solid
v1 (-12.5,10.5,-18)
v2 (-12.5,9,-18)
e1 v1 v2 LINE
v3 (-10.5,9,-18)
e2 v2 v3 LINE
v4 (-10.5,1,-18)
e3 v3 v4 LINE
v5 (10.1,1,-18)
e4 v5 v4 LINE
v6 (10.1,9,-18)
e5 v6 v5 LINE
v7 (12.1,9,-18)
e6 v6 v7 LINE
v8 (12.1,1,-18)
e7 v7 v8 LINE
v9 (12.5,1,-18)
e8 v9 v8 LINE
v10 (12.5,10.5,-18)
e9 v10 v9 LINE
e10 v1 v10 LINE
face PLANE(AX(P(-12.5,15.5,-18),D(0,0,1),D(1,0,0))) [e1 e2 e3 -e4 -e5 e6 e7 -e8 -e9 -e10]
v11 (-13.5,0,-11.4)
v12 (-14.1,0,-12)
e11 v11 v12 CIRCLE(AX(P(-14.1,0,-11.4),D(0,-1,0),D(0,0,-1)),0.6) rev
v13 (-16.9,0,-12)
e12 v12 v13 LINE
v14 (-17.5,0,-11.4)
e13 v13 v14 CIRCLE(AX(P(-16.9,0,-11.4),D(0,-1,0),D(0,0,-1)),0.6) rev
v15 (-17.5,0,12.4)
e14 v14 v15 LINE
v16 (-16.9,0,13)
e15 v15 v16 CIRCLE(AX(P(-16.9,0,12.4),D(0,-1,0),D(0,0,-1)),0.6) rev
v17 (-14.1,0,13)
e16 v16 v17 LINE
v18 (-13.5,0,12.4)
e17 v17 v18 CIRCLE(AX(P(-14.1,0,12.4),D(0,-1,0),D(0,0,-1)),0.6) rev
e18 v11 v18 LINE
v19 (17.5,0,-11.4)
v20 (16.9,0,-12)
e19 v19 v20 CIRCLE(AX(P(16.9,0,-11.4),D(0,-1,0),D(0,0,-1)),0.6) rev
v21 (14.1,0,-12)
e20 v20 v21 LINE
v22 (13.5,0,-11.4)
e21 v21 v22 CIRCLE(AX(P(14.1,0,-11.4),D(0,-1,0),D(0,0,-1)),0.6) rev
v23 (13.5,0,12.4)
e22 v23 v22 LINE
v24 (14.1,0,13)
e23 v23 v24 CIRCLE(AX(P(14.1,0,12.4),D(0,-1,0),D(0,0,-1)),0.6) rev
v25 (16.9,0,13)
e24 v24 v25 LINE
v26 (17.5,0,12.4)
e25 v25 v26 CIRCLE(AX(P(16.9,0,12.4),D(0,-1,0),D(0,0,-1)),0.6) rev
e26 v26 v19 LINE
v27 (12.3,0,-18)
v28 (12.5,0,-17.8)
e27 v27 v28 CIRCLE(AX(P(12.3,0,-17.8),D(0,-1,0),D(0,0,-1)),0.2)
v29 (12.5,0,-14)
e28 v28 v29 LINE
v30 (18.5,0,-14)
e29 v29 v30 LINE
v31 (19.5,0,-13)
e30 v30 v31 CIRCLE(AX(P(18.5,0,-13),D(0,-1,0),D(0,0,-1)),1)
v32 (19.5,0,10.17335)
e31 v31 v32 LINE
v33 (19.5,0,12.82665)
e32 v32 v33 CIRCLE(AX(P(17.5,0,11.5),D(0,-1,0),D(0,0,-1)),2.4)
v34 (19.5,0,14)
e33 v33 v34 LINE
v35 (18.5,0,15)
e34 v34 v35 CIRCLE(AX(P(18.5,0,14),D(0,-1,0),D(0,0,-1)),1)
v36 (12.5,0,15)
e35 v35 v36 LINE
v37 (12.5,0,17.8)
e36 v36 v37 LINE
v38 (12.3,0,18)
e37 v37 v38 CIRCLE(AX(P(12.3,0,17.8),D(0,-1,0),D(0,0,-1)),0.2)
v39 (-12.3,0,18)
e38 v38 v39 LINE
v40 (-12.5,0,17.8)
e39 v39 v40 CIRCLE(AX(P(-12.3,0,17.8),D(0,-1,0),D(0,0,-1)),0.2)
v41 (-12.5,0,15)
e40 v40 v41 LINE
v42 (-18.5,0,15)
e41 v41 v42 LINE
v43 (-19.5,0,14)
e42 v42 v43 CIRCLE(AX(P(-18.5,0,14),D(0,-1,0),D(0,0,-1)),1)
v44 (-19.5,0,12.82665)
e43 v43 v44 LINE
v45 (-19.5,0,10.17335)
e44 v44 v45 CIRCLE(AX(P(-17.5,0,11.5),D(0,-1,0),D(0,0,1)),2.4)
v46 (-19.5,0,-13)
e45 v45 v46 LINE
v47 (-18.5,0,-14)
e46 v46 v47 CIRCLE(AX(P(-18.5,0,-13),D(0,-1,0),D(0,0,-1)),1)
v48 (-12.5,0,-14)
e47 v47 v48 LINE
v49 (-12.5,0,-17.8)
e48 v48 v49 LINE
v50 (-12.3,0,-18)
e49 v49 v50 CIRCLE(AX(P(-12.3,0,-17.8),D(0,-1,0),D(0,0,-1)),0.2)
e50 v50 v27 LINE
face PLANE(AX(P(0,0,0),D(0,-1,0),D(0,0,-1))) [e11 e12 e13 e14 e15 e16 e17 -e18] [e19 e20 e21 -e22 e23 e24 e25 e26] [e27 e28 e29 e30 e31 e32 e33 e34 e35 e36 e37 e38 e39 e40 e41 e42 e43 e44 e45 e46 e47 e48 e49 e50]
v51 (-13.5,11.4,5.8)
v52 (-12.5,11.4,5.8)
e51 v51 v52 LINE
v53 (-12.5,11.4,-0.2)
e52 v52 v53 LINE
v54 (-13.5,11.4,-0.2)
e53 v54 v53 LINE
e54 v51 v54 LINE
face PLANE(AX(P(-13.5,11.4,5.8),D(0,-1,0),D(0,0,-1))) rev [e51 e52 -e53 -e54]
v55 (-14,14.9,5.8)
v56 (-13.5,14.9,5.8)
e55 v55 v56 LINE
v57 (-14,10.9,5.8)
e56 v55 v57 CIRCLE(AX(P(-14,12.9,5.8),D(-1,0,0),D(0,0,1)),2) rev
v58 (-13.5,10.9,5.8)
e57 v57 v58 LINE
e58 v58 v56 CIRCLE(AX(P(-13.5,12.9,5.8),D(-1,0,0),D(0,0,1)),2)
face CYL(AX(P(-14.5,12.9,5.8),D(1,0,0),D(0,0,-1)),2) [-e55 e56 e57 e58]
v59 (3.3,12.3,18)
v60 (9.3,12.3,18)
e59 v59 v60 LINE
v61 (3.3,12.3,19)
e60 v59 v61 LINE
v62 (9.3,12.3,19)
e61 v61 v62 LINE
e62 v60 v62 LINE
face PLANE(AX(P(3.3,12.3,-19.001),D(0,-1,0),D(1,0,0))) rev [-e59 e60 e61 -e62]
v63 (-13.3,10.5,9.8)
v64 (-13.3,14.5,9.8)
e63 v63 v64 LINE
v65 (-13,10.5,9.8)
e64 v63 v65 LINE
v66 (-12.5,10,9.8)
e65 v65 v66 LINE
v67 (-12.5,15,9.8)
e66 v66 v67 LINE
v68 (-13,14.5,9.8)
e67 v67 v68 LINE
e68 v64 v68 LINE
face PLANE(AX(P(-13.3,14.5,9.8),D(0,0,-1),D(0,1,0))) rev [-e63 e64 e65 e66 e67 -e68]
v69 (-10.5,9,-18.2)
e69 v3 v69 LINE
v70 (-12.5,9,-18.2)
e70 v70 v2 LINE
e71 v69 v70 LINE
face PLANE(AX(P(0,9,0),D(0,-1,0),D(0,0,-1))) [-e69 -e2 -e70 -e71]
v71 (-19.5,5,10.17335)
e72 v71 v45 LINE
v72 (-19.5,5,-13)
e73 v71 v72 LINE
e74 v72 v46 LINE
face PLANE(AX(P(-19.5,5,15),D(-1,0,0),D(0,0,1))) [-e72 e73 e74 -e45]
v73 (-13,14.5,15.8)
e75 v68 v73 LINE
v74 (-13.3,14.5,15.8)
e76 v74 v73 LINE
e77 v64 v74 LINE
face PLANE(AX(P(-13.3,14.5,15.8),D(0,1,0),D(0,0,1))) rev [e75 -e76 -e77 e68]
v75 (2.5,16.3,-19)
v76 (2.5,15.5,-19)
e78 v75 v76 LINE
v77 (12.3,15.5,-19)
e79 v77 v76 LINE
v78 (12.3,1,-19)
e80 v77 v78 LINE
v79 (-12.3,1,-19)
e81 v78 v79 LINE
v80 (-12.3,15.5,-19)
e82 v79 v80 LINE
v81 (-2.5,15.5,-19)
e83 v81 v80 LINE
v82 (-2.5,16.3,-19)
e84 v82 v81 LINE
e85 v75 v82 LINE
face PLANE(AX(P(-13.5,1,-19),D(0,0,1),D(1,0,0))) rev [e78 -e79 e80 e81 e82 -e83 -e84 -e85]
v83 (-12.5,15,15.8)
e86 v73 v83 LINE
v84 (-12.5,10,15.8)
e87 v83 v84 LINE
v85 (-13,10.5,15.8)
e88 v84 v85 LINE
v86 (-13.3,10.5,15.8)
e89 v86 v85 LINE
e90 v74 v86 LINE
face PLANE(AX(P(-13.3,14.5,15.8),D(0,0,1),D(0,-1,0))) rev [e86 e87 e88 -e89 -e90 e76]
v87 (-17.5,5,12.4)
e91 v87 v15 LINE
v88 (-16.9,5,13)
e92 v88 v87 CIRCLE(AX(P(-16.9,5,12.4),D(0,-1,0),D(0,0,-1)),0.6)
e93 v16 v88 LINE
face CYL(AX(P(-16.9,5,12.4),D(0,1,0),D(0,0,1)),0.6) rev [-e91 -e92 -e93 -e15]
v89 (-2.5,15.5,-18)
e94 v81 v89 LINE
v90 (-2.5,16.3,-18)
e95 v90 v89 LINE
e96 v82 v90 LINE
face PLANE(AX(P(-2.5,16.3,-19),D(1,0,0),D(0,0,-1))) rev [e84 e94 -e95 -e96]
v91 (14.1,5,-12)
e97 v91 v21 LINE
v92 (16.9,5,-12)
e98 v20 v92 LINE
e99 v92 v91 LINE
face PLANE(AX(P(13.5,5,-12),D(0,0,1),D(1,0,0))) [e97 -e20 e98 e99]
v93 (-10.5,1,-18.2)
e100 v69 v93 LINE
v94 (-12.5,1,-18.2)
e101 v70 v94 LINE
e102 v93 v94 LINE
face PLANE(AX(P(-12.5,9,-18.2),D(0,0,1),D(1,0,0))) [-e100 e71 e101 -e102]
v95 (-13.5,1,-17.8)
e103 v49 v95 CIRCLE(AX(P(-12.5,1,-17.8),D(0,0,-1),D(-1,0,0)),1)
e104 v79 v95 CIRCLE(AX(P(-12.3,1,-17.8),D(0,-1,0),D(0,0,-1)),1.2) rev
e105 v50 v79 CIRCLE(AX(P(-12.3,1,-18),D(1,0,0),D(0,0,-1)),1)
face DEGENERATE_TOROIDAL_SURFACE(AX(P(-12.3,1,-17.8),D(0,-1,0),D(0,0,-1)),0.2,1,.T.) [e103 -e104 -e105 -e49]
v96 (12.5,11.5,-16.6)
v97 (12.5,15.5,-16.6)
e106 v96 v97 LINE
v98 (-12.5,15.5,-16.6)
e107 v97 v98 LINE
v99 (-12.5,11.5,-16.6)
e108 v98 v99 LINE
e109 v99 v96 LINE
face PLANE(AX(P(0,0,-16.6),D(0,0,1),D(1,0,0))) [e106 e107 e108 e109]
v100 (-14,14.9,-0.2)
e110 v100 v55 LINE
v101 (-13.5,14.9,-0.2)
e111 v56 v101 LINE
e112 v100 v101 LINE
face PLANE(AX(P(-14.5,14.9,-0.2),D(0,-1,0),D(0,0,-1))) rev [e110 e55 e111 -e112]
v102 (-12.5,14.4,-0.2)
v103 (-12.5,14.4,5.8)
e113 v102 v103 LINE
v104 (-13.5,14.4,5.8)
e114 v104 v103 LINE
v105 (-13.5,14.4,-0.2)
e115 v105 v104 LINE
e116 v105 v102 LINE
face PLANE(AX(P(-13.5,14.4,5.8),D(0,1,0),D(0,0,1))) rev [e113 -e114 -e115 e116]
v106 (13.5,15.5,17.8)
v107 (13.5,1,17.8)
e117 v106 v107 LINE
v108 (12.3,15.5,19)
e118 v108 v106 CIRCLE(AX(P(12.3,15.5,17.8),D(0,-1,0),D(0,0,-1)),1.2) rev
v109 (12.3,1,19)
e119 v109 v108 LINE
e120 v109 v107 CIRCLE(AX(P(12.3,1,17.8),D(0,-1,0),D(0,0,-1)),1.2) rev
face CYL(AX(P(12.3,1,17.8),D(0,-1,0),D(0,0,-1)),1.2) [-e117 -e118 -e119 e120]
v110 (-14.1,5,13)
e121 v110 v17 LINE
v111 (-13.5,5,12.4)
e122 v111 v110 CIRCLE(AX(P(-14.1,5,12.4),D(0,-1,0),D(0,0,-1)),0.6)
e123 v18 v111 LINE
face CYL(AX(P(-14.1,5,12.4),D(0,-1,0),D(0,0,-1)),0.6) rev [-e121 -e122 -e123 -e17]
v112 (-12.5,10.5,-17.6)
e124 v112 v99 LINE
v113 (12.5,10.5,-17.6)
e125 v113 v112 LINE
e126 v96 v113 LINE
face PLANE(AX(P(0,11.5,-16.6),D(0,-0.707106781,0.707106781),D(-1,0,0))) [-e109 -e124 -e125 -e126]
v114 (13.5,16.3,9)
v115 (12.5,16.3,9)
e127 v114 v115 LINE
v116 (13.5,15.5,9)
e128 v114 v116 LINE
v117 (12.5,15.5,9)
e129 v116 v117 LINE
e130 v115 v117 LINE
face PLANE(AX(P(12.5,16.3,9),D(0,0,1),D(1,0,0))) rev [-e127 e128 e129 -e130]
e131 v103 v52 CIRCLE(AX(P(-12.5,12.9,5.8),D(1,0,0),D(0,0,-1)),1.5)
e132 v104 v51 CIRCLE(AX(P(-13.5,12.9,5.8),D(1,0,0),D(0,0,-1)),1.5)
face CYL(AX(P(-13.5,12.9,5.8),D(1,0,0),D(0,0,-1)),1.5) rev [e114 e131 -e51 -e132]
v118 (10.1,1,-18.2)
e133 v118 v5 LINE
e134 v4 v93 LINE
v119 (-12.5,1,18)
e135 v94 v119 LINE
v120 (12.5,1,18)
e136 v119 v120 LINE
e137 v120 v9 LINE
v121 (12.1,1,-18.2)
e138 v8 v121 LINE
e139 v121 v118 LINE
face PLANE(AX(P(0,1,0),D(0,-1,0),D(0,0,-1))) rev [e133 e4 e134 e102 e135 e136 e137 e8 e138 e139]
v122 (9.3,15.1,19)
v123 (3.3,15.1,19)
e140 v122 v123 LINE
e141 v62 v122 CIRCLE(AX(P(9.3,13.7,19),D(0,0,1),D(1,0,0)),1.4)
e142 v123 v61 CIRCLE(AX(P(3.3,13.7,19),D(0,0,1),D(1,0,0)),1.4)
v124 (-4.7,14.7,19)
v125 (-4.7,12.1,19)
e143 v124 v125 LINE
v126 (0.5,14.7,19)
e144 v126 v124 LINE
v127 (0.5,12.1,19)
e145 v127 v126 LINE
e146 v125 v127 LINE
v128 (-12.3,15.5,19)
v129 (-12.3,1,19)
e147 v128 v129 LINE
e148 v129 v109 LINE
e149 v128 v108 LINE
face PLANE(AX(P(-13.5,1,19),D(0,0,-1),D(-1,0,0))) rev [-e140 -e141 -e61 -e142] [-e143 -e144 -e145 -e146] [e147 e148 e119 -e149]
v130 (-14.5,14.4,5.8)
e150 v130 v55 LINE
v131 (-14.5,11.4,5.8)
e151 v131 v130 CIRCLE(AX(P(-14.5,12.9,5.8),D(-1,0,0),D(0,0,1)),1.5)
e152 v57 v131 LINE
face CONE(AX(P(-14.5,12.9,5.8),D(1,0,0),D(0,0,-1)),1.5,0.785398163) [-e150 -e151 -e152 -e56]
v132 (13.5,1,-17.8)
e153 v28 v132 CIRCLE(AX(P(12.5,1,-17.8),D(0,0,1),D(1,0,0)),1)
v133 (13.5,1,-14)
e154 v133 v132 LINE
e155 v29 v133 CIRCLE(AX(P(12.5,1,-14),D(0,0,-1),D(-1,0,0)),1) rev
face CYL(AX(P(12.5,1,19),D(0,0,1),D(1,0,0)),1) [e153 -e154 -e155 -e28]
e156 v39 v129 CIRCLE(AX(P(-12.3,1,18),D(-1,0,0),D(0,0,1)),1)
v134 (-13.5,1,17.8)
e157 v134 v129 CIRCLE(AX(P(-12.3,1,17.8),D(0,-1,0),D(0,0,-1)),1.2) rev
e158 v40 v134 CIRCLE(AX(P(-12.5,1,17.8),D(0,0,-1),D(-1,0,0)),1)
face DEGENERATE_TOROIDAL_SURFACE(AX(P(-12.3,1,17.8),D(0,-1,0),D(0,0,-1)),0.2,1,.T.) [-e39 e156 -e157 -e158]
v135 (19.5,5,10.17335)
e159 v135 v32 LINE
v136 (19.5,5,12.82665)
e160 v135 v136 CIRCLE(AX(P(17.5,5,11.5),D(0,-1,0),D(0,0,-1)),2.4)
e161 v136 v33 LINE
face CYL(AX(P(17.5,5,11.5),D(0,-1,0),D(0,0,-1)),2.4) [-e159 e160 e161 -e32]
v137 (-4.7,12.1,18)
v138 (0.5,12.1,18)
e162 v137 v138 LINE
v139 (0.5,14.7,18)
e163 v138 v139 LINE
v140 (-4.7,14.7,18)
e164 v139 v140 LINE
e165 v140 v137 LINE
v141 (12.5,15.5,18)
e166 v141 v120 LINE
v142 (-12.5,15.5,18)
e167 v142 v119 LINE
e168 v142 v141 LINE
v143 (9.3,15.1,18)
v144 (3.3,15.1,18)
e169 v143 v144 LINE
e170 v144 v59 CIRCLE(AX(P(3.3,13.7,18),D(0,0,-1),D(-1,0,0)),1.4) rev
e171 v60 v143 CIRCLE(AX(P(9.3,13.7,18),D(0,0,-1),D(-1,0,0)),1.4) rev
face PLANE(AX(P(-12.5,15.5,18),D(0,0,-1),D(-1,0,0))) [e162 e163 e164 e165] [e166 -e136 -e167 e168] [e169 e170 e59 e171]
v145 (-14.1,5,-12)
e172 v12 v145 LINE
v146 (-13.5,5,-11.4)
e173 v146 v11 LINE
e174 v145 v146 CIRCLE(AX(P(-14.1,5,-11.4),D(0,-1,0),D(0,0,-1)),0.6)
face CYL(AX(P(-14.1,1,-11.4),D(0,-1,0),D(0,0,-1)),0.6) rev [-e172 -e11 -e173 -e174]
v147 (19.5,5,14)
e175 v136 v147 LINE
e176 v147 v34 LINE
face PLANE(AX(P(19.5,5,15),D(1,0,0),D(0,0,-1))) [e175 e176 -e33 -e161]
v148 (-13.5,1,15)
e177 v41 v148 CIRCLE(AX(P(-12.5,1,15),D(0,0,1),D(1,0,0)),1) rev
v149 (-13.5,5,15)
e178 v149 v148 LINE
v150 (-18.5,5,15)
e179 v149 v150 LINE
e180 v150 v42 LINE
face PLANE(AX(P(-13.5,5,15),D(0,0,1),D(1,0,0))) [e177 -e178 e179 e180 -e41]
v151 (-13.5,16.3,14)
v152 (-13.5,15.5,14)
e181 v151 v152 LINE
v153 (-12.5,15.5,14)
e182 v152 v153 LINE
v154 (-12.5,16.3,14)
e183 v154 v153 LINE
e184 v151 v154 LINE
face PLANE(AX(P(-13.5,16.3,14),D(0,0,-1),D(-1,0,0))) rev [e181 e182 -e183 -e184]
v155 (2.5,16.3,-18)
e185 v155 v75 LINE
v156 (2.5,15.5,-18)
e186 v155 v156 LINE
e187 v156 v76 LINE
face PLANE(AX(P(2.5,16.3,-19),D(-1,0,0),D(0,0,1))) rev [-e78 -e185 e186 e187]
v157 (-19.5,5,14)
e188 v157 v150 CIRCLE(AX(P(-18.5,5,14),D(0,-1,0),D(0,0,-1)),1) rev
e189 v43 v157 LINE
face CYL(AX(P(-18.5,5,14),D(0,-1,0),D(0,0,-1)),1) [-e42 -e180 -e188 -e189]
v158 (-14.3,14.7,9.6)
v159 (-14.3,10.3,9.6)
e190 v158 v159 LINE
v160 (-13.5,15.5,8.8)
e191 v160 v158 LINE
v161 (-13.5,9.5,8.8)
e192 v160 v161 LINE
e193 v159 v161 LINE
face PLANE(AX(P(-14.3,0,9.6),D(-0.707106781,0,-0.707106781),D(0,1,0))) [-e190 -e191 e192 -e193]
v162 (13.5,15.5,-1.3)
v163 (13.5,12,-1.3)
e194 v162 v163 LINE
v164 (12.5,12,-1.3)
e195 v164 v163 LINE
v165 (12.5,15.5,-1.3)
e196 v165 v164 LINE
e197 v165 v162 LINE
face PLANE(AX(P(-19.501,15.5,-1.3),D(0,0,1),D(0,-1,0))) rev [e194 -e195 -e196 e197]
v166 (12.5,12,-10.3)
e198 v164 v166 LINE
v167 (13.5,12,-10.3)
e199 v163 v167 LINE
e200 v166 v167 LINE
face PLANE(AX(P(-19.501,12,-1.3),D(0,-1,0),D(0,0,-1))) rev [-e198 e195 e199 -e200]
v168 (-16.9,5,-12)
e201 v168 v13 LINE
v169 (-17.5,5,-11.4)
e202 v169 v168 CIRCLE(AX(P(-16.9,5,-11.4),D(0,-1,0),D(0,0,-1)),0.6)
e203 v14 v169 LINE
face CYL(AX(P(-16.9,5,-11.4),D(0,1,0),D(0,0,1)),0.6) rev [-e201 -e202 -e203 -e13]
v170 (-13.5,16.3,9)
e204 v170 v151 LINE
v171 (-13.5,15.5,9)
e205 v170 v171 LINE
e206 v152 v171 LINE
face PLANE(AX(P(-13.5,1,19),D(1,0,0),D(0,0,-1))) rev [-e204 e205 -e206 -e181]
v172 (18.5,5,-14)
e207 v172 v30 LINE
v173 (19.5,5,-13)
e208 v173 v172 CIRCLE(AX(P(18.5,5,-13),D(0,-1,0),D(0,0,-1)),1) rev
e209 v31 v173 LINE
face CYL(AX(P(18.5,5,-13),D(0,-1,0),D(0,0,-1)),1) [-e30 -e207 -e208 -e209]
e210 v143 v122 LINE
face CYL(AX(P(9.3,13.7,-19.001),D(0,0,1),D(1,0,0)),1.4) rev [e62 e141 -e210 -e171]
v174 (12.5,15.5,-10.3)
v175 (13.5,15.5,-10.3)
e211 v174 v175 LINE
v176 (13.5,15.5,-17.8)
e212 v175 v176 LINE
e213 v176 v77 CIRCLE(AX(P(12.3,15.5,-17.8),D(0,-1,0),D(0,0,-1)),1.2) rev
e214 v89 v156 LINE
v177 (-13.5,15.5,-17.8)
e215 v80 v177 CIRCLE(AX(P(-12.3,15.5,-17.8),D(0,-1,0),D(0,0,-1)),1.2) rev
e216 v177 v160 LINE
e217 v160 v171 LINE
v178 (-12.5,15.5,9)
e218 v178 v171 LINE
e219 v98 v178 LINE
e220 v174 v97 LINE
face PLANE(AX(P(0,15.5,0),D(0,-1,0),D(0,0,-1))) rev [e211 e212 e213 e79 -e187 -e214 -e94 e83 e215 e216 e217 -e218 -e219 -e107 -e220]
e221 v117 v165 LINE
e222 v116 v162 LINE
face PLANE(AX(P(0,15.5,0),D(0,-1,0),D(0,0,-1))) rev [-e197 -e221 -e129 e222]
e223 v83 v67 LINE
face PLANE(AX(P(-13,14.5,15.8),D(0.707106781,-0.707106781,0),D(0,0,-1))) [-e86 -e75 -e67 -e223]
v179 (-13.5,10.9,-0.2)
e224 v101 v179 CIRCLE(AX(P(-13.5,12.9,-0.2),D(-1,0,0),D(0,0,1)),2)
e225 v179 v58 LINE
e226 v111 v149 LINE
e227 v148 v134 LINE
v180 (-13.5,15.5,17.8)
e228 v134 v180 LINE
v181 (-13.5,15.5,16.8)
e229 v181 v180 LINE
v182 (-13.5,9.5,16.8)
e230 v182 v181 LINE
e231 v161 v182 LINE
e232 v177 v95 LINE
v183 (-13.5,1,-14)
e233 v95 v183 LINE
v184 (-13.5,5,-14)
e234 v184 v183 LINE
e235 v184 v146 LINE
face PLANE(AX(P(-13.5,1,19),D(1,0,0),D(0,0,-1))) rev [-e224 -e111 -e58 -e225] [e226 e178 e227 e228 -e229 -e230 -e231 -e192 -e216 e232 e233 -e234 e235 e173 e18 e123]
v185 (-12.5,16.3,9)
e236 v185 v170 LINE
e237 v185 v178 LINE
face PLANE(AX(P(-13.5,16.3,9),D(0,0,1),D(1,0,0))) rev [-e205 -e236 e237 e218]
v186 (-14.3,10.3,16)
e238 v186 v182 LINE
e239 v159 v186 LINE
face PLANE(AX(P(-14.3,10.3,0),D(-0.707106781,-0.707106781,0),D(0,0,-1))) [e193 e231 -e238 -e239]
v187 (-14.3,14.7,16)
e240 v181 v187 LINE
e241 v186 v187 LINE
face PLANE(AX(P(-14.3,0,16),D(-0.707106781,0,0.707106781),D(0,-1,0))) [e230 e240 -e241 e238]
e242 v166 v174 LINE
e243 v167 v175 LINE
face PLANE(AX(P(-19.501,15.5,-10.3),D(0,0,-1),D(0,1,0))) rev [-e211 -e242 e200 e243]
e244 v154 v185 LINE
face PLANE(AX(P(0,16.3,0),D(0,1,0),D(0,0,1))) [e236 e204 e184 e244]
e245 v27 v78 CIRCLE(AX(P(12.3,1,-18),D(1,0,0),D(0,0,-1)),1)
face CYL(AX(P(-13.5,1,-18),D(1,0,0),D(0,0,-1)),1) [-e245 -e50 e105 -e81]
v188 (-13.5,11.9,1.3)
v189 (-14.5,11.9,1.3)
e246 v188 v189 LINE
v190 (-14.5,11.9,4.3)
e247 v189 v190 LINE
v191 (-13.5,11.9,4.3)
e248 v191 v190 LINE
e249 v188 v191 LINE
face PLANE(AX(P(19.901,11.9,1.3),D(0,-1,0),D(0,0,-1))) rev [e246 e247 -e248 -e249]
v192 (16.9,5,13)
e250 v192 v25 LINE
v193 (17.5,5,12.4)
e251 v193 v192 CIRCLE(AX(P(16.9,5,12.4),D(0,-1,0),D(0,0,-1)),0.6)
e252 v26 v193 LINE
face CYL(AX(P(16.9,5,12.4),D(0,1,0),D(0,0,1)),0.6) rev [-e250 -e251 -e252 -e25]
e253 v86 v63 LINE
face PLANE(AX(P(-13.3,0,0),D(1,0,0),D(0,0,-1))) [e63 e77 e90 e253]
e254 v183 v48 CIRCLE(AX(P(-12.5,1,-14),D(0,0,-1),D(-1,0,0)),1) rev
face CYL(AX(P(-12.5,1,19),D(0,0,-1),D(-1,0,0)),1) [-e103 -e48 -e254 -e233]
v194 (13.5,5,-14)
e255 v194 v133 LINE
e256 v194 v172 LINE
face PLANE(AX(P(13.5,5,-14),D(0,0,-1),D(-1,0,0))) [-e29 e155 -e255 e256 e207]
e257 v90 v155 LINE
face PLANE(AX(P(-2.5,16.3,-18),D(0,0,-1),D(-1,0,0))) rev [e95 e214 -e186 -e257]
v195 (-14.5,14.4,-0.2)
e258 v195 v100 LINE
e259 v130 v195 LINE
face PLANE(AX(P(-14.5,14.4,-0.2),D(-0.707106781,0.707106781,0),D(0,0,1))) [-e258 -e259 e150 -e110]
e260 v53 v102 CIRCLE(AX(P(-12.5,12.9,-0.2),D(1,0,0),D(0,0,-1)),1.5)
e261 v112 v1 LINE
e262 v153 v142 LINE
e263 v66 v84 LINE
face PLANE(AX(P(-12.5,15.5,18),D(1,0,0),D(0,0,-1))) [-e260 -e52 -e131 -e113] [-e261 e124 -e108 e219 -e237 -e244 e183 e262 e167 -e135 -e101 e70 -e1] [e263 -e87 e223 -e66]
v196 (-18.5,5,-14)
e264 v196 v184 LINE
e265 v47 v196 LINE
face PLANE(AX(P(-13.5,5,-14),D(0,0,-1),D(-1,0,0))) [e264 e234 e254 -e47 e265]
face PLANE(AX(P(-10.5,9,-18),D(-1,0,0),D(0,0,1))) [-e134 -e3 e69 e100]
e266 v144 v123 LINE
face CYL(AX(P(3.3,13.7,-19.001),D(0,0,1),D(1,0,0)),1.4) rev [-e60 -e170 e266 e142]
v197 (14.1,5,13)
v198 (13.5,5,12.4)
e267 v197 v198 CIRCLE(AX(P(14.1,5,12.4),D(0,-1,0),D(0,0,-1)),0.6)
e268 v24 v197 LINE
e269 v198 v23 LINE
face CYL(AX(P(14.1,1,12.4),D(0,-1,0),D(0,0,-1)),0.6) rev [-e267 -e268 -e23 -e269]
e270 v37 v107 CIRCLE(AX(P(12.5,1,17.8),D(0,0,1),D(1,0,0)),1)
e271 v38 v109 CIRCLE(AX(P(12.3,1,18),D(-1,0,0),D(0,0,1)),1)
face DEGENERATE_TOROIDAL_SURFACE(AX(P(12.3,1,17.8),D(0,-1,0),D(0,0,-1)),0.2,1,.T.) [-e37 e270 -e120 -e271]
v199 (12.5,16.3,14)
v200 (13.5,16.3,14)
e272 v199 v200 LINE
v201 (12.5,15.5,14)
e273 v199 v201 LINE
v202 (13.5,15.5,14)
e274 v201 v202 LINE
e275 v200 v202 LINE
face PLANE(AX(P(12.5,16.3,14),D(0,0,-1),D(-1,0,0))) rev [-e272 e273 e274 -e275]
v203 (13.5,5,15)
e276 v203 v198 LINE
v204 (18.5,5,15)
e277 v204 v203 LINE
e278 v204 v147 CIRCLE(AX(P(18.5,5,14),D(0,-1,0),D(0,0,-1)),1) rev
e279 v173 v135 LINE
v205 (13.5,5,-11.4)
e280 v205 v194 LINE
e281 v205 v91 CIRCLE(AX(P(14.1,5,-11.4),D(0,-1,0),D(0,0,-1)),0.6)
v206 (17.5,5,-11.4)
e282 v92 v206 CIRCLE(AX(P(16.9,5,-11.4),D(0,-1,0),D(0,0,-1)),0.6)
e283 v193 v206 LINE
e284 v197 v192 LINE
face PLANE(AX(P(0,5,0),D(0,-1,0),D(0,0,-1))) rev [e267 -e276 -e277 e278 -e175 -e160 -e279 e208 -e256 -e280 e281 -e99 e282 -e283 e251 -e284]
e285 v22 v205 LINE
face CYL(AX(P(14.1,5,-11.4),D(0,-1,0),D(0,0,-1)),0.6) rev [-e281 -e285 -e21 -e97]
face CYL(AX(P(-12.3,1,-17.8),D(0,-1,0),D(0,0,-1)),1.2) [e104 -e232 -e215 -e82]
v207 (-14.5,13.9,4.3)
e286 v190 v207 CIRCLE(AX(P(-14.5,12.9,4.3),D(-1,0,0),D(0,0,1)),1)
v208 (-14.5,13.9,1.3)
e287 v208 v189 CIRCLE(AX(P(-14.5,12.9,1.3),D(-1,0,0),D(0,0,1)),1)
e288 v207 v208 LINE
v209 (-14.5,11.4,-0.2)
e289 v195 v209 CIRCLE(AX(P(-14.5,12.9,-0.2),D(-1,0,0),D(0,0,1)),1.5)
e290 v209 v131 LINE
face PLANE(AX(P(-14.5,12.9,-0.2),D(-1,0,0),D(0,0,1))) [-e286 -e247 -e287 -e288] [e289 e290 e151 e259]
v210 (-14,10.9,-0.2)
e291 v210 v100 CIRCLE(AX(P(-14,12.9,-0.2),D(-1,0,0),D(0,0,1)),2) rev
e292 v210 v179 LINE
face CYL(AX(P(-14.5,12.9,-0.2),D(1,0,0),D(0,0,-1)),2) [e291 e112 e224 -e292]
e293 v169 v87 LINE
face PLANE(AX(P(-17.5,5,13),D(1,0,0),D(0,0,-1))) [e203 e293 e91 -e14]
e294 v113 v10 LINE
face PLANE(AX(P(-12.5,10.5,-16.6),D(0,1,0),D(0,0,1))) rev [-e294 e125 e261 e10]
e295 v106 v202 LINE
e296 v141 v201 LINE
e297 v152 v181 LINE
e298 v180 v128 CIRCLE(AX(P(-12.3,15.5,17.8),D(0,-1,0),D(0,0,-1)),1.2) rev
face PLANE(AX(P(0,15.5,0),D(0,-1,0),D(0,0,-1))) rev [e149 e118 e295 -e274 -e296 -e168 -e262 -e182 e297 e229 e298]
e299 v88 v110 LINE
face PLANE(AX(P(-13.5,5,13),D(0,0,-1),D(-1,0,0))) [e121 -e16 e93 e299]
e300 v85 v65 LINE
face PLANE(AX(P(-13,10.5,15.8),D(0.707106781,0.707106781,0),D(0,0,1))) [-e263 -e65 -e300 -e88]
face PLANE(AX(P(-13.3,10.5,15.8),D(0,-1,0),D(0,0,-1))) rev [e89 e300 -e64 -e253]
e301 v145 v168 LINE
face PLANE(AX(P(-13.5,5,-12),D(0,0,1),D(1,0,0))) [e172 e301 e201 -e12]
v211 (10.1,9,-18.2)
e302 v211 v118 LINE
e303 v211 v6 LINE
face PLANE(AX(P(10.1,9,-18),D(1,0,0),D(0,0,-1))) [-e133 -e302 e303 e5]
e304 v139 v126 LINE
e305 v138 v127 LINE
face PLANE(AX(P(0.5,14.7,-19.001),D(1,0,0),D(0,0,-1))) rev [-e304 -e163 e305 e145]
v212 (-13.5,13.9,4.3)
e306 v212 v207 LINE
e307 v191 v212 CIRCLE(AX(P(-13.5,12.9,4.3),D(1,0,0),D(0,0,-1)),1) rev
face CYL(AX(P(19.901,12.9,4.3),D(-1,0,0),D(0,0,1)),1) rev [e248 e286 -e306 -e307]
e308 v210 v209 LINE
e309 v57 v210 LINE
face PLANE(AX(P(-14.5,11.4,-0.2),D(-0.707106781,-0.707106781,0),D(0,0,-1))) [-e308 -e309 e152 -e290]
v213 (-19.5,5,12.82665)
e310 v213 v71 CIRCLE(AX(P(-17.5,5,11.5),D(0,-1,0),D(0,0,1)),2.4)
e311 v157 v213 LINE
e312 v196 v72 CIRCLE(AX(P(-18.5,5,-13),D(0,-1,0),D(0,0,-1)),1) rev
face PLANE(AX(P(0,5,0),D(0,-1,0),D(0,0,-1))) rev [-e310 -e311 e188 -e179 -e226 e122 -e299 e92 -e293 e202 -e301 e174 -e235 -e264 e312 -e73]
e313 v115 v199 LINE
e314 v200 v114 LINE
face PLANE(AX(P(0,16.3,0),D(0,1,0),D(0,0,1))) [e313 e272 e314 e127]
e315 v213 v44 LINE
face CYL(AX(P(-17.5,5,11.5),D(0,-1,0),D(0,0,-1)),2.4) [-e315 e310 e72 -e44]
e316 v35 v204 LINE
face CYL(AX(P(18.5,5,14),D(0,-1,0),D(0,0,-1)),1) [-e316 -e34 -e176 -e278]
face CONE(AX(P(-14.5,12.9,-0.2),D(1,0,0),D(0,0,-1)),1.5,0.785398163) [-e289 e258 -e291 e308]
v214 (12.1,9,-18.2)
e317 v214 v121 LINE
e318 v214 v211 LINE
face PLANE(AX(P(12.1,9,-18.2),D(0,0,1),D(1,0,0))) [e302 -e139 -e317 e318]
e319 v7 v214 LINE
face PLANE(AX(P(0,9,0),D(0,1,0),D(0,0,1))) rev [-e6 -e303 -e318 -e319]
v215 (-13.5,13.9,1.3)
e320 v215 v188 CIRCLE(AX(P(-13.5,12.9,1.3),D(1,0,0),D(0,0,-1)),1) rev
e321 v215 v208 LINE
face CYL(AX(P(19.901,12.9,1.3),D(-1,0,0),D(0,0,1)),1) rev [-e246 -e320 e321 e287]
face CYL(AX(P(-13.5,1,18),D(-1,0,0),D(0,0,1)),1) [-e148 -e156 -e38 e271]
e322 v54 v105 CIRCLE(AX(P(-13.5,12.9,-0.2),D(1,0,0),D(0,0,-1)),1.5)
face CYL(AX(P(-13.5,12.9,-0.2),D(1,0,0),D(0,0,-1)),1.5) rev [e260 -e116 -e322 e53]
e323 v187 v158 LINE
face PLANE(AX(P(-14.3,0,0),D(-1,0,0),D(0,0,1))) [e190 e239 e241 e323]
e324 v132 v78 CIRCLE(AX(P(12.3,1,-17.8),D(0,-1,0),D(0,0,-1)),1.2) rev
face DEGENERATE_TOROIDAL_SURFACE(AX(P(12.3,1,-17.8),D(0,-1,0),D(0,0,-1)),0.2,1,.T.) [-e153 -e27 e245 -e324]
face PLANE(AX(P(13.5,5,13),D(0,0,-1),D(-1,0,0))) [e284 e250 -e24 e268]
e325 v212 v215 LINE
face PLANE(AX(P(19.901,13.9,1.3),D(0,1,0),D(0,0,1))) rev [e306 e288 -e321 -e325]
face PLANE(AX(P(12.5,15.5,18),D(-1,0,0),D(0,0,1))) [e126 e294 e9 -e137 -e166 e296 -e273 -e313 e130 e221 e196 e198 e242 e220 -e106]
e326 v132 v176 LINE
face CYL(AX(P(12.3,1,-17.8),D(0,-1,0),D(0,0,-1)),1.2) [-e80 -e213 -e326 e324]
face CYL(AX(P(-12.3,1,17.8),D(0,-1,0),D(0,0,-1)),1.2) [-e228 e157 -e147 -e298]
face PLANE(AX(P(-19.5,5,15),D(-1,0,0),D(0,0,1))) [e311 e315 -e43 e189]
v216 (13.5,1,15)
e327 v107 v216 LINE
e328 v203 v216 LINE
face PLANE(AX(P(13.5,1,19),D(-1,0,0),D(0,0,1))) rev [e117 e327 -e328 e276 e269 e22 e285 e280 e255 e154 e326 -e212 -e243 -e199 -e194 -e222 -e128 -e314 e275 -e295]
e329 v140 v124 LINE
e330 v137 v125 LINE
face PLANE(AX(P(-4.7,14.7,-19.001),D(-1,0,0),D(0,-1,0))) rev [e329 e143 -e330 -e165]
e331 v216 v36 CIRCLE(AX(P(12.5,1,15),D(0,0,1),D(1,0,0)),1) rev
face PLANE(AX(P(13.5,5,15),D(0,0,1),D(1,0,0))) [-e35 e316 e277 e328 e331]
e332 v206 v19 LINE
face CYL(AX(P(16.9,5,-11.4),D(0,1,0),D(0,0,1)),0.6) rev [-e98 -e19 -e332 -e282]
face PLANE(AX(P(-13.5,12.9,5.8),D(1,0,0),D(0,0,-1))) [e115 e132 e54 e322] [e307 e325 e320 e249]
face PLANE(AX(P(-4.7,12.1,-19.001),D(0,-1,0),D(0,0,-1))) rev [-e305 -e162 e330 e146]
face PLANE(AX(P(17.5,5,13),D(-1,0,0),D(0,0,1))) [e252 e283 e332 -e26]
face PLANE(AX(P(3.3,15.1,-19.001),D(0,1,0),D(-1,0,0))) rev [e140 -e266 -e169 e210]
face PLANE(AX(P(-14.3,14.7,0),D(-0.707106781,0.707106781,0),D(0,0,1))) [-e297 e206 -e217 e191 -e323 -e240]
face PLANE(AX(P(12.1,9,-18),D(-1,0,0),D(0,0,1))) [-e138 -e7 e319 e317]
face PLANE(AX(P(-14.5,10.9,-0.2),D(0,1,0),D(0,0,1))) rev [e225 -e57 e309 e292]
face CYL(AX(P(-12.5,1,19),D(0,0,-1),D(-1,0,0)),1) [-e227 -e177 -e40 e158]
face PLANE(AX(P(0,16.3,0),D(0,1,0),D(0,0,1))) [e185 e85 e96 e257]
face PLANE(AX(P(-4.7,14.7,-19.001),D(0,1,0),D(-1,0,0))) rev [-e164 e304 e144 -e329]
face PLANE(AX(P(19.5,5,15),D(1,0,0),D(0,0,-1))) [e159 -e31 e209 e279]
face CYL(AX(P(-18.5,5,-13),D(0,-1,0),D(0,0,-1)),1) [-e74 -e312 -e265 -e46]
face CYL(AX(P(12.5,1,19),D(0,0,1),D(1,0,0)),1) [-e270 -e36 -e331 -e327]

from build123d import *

# Parameters (mm, degrees)
SKETCH_1_W          = 27
SKETCH_1_H          = 38
EXTRUDE_1_DEPTH     = 1
SKETCH_3_W          = 27
SKETCH_3_H          = 38
SKETCH_3_W_2        = 25
SKETCH_3_H_2        = 36
EXTRUDE_2_DEPTH     = 14.5
FILLET_1_R          = 1.2
EXTRUDE_3_DEPTH     = 5
FILLET_3_R          = 1
FILLET_4_R          = 0.6
FILLET_6_R          = 1
CUT_EXTRUDE_1_REACH = 47.437
CUT_EXTRUDE_2_REACH = 43.113
SKETCH_6_W          = 9
SKETCH_6_H          = 3.5
EXTRUDE_4_DEPTH     = 5
CUT_EXTRUDE_3_REACH = 47.61
SKETCH_8_W          = 5.2
SKETCH_8_H          = 2.6
SKETCH_13_W         = 6
SKETCH_13_H         = 4
CUT_EXTRUDE_6_DEPTH = 0.8
SKETCH_15_W         = 25
SKETCH_15_H         = 5
EXTRUDE_5_DEPTH     = 1.4
CHAMFER_3_SIZE      = 1
SKETCH_16_W         = 2
SKETCH_16_H         = 0.2
CUT_EXTRUDE_7_DEPTH = 8
SKETCH_18_W         = 5
SKETCH_18_H         = 1
SKETCH_18_W_2       = 1
SKETCH_18_H_2       = 5
EXTRUDE_6_DEPTH     = 0.8
EXTRUDE_9_DEPTH     = 1
CUT_EXTRUDE_8_REACH = 44.545
CUT_EXTRUDE_9_DEPTH = 1
CHAMFER_4_SIZE      = 0.5
SKETCH_22_W         = 8
SKETCH_22_H         = 6
EXTRUDE_10_DEPTH    = 0.8
CHAMFER_6_SIZE      = 0.8
CHAMFER_7_SIZE      = 0.5


with BuildPart() as part:
    # 草图1 → 凸台-拉伸1 (new body)
    with BuildSketch(Plane(origin=(0, 0, 0), x_dir=(1, 0, 0), z_dir=(0, 1, 0))):
        Rectangle(SKETCH_1_W, SKETCH_1_H)
    extrude(amount=EXTRUDE_1_DEPTH)

    # 草图3 → 凸台-拉伸2 (add)
    with BuildSketch(Plane(origin=(0, 1, 0), x_dir=(1, 0, 0), z_dir=(0, 1, 0))):
        Rectangle(SKETCH_3_W, SKETCH_3_H)
        Rectangle(SKETCH_3_W_2, SKETCH_3_H_2, mode=Mode.SUBTRACT)
    extrude(amount=EXTRUDE_2_DEPTH)

    # 圆角1
    fillet_1_edges = [part.edges().sort_by_distance(p)[0] for p in [
        (13.5, 7.75, 19),
        (-13.5, 7.75, 19),
        (-13.5, 7.75, -19),
        (13.5, 7.75, -19),
    ]]
    fillet(fillet_1_edges, radius=FILLET_1_R)

    # 草图4 → 凸台-拉伸3 (add)
    with BuildSketch(Plane.XZ):
        Polygon((13.5, 15), (19.5, 15), (19.5, -14), (13.5, -14), (13.5, -12), (17.5, -12), (17.5, 13), (13.5, 13), align=None)
        Polygon((-17.5, 13), (-17.5, -12), (-13.5, -12), (-13.5, -14), (-19.5, -14), (-19.5, 15), (-13.5, 15), (-13.5, 13), align=None)
    extrude(amount=-EXTRUDE_3_DEPTH)

    # 圆角3
    fillet_3_edges = [part.edges().sort_by_distance(p)[0] for p in [
        (19.5, 2.5, 15),
        (19.5, 2.5, -14),
        (-19.5, 2.5, -14),
        (-19.5, 2.5, 15),
    ]]
    fillet(fillet_3_edges, radius=FILLET_3_R)

    # 圆角4
    fillet_4_edges = [part.edges().sort_by_distance(p)[0] for p in [
        (13.5, 2.5, 13),
        (13.5, 2.5, -12),
        (17.5, 2.5, -12),
        (17.5, 2.5, 13),
        (-13.5, 2.5, 13),
        (-17.5, 2.5, 13),
        (-17.5, 2.5, -12),
        (-13.5, 2.5, -12),
    ]]
    fillet(fillet_4_edges, radius=FILLET_4_R)

    # 圆角6
    fillet_6_edges = [part.edges().sort_by_distance(p)[0] for p in [
        (0, 0, -19),
        (13.5, 0, 16.4),
        (0, 0, 19),
        (-13.5, 0, -15.9),
        (13.148528137, 0, 18.648528137),
        (-13.148528137, 0, 18.648528137),
        (-13.148528137, 0, -18.648528137),
        (13.148528137, 0, -18.648528137),
        (13.5, 0, -15.9),
        (-13.5, 0, 16.4),
    ]]
    fillet(fillet_6_edges, radius=FILLET_6_R)

    # 草图5 → 切除-拉伸1 (cut, up to next)
    with BuildSketch(Plane.XY.offset(19), mode=Mode.PRIVATE) as cut_extrude_1_sk1:
        with BuildLine():
            Line((3.3, 15.1), (9.3, 15.1))
            ThreePointArc((9.3, 15.1), (10.7, 13.7), (9.3, 12.3))
            Line((9.3, 12.3), (3.3, 12.3))
            ThreePointArc((3.3, 12.3), (1.9, 13.7), (3.3, 15.1))
        make_face()
    cut_extrude_1_tool1 = extrude(cut_extrude_1_sk1.sketch, amount=-CUT_EXTRUDE_1_REACH, mode=Mode.PRIVATE) & part.part
    add(cut_extrude_1_tool1.solids().sort_by_distance((6.3, 13.7, 19))[0], mode=Mode.SUBTRACT)

    # 草图6 → 切除-拉伸2 (cut, up to next)
    with BuildSketch(Plane(origin=(13.5, 0, 0), x_dir=(0, 0, -1), z_dir=(1, 0, 0)), mode=Mode.PRIVATE) as cut_extrude_2_sk1:
        with Locations((5.8, 13.75)):
            Rectangle(SKETCH_6_W, SKETCH_6_H)
    cut_extrude_2_tool1 = extrude(cut_extrude_2_sk1.sketch, amount=-CUT_EXTRUDE_2_REACH, mode=Mode.PRIVATE) & part.part
    add(cut_extrude_2_tool1.solids().sort_by_distance((13.5, 13.75, -5.8))[0], mode=Mode.SUBTRACT)

    # 草图7 → 凸台-拉伸4 (add)
    with BuildSketch(Plane.XZ):
        with BuildLine():
            Line((19.5, 12.826649916), (19.5, 10.173350084))
            ThreePointArc((19.5, 10.173350084), (19.9, 11.5), (19.5, 12.826649916))
        make_face()
        with BuildLine():
            Line((-19.5, 12.826649916), (-19.5, 10.173350084))
            ThreePointArc((-19.5, 10.173350084), (-19.9, 11.5), (-19.5, 12.826649916))
        make_face()
    extrude(amount=-EXTRUDE_4_DEPTH)

    # 草图8 → 切除-拉伸3 (cut, up to next)
    with BuildSketch(Plane.XY.offset(19), mode=Mode.PRIVATE) as cut_extrude_3_sk1:
        with Locations((-2.1, 13.4)):
            Rectangle(SKETCH_8_W, SKETCH_8_H)
    cut_extrude_3_tool1 = extrude(cut_extrude_3_sk1.sketch, amount=-CUT_EXTRUDE_3_REACH, mode=Mode.PRIVATE) & part.part
    add(cut_extrude_3_tool1.solids().sort_by_distance((-2.1, 13.4, 19))[0], mode=Mode.SUBTRACT)

    # 草图13 → 切除-拉伸6 (cut)
    with BuildSketch(Plane(origin=(-12.5, 0, 0), x_dir=(0, 0, -1), z_dir=(1, 0, 0))):
        with Locations((-12.8, 12.5)):
            Rectangle(SKETCH_13_W, SKETCH_13_H)
    extrude(amount=-CUT_EXTRUDE_6_DEPTH, mode=Mode.SUBTRACT)

    # 草图15 → 凸台-拉伸5 (add)
    with BuildSketch(Plane.XY.offset(-18)):
        with Locations((0, 13)):
            Rectangle(SKETCH_15_W, SKETCH_15_H)
    extrude(amount=EXTRUDE_5_DEPTH)

    # 倒角3
    chamfer_3_edges = [part.edges().sort_by_distance(p)[0] for p in [
        (0, 10.5, -16.6),
    ]]
    chamfer(chamfer_3_edges, length=CHAMFER_3_SIZE)

    # 草图16 → 切除-拉伸7 (cut)
    with BuildSketch(Plane(origin=(0, 1, 0), x_dir=(1, 0, 0), z_dir=(0, 1, 0))):
        with Locations((-11.5, 18.1)):
            Rectangle(SKETCH_16_W, SKETCH_16_H)
        with Locations((11.1, 18.1)):
            Rectangle(SKETCH_16_W, SKETCH_16_H)
    extrude(amount=CUT_EXTRUDE_7_DEPTH, mode=Mode.SUBTRACT)

    # 草图18 → 凸台-拉伸6 (add)
    with BuildSketch(Plane(origin=(0, 15.5, 0), x_dir=(1, 0, 0), z_dir=(0, 1, 0))):
        with Locations((0, 18.5)):
            Rectangle(SKETCH_18_W, SKETCH_18_H)
        with Locations((-13, -11.5)):
            Rectangle(SKETCH_18_W_2, SKETCH_18_H_2)
        with Locations((13, -11.5)):
            Rectangle(SKETCH_18_W_2, SKETCH_18_H_2)
    extrude(amount=EXTRUDE_6_DEPTH)

    # 草图19 → 凸台-拉伸9 (add)
    with BuildSketch(Plane.ZY.offset(13.5)):
        with BuildLine():
            Line((-0.2, 14.9), (5.8, 14.9))
            ThreePointArc((5.8, 14.9), (7.8, 12.9), (5.8, 10.9))
            Line((5.8, 10.9), (-0.2, 10.9))
            ThreePointArc((-0.2, 10.9), (-2.2, 12.9), (-0.2, 14.9))
        make_face()
    extrude(amount=EXTRUDE_9_DEPTH)

    # 草图20 → 切除-拉伸8 (cut, up to next)
    with BuildSketch(Plane.ZY.offset(14.5), mode=Mode.PRIVATE) as cut_extrude_8_sk1:
        with BuildLine():
            Line((1.3, 13.9), (4.3, 13.9))
            ThreePointArc((4.3, 13.9), (5.3, 12.9), (4.3, 11.9))
            Line((4.3, 11.9), (1.3, 11.9))
            ThreePointArc((1.3, 11.9), (0.3, 12.9), (1.3, 13.9))
        make_face()
    cut_extrude_8_tool1 = extrude(cut_extrude_8_sk1.sketch, amount=-CUT_EXTRUDE_8_REACH, mode=Mode.PRIVATE) & part.part
    add(cut_extrude_8_tool1.solids().sort_by_distance((-14.5, 12.9, 2.8))[0], mode=Mode.SUBTRACT)

    # 草图21 → 切除-拉伸9 (cut)
    with BuildSketch(Plane(origin=(-12.5, 0, 0), x_dir=(0, 0, -1), z_dir=(1, 0, 0))):
        with BuildLine():
            Line((-5.8, 14.4), (0.2, 14.4))
            ThreePointArc((0.2, 14.4), (1.7, 12.9), (0.2, 11.4))
            Line((0.2, 11.4), (-5.8, 11.4))
            ThreePointArc((-5.8, 11.4), (-7.3, 12.9), (-5.8, 14.4))
        make_face()
    extrude(amount=-CUT_EXTRUDE_9_DEPTH, mode=Mode.SUBTRACT)

    # 倒角4
    chamfer_4_edges = [part.edges().sort_by_distance(p)[0] for p in [
        (-14.5, 12.9, -2.2),
        (-14.5, 10.9, 2.8),
        (-14.5, 12.9, 7.8),
        (-14.5, 14.9, 2.8),
    ]]
    chamfer(chamfer_4_edges, length=CHAMFER_4_SIZE)

    # 草图22 → 凸台-拉伸10 (add)
    with BuildSketch(Plane.ZY.offset(13.5)):
        with Locations((12.8, 12.5)):
            Rectangle(SKETCH_22_W, SKETCH_22_H)
    extrude(amount=EXTRUDE_10_DEPTH)

    # 倒角6
    chamfer_6_edges = [part.edges().sort_by_distance(p)[0] for p in [
        (-14.3, 12.5, 16.8),
        (-14.3, 9.5, 12.8),
        (-14.3, 15.5, 12.8),
        (-14.3, 12.5, 8.8),
    ]]
    chamfer(chamfer_6_edges, length=CHAMFER_6_SIZE - 0.0001)  # a hair under: the kernel refuses the full size

    # 倒角7
    chamfer_7_edges = [part.edges().sort_by_distance(p)[0] for p in [
        (-12.5, 10.5, 12.8),
        (-12.5, 14.5, 12.8),
    ]]
    chamfer(chamfer_7_edges, length=CHAMFER_7_SIZE)


solid = part.part
